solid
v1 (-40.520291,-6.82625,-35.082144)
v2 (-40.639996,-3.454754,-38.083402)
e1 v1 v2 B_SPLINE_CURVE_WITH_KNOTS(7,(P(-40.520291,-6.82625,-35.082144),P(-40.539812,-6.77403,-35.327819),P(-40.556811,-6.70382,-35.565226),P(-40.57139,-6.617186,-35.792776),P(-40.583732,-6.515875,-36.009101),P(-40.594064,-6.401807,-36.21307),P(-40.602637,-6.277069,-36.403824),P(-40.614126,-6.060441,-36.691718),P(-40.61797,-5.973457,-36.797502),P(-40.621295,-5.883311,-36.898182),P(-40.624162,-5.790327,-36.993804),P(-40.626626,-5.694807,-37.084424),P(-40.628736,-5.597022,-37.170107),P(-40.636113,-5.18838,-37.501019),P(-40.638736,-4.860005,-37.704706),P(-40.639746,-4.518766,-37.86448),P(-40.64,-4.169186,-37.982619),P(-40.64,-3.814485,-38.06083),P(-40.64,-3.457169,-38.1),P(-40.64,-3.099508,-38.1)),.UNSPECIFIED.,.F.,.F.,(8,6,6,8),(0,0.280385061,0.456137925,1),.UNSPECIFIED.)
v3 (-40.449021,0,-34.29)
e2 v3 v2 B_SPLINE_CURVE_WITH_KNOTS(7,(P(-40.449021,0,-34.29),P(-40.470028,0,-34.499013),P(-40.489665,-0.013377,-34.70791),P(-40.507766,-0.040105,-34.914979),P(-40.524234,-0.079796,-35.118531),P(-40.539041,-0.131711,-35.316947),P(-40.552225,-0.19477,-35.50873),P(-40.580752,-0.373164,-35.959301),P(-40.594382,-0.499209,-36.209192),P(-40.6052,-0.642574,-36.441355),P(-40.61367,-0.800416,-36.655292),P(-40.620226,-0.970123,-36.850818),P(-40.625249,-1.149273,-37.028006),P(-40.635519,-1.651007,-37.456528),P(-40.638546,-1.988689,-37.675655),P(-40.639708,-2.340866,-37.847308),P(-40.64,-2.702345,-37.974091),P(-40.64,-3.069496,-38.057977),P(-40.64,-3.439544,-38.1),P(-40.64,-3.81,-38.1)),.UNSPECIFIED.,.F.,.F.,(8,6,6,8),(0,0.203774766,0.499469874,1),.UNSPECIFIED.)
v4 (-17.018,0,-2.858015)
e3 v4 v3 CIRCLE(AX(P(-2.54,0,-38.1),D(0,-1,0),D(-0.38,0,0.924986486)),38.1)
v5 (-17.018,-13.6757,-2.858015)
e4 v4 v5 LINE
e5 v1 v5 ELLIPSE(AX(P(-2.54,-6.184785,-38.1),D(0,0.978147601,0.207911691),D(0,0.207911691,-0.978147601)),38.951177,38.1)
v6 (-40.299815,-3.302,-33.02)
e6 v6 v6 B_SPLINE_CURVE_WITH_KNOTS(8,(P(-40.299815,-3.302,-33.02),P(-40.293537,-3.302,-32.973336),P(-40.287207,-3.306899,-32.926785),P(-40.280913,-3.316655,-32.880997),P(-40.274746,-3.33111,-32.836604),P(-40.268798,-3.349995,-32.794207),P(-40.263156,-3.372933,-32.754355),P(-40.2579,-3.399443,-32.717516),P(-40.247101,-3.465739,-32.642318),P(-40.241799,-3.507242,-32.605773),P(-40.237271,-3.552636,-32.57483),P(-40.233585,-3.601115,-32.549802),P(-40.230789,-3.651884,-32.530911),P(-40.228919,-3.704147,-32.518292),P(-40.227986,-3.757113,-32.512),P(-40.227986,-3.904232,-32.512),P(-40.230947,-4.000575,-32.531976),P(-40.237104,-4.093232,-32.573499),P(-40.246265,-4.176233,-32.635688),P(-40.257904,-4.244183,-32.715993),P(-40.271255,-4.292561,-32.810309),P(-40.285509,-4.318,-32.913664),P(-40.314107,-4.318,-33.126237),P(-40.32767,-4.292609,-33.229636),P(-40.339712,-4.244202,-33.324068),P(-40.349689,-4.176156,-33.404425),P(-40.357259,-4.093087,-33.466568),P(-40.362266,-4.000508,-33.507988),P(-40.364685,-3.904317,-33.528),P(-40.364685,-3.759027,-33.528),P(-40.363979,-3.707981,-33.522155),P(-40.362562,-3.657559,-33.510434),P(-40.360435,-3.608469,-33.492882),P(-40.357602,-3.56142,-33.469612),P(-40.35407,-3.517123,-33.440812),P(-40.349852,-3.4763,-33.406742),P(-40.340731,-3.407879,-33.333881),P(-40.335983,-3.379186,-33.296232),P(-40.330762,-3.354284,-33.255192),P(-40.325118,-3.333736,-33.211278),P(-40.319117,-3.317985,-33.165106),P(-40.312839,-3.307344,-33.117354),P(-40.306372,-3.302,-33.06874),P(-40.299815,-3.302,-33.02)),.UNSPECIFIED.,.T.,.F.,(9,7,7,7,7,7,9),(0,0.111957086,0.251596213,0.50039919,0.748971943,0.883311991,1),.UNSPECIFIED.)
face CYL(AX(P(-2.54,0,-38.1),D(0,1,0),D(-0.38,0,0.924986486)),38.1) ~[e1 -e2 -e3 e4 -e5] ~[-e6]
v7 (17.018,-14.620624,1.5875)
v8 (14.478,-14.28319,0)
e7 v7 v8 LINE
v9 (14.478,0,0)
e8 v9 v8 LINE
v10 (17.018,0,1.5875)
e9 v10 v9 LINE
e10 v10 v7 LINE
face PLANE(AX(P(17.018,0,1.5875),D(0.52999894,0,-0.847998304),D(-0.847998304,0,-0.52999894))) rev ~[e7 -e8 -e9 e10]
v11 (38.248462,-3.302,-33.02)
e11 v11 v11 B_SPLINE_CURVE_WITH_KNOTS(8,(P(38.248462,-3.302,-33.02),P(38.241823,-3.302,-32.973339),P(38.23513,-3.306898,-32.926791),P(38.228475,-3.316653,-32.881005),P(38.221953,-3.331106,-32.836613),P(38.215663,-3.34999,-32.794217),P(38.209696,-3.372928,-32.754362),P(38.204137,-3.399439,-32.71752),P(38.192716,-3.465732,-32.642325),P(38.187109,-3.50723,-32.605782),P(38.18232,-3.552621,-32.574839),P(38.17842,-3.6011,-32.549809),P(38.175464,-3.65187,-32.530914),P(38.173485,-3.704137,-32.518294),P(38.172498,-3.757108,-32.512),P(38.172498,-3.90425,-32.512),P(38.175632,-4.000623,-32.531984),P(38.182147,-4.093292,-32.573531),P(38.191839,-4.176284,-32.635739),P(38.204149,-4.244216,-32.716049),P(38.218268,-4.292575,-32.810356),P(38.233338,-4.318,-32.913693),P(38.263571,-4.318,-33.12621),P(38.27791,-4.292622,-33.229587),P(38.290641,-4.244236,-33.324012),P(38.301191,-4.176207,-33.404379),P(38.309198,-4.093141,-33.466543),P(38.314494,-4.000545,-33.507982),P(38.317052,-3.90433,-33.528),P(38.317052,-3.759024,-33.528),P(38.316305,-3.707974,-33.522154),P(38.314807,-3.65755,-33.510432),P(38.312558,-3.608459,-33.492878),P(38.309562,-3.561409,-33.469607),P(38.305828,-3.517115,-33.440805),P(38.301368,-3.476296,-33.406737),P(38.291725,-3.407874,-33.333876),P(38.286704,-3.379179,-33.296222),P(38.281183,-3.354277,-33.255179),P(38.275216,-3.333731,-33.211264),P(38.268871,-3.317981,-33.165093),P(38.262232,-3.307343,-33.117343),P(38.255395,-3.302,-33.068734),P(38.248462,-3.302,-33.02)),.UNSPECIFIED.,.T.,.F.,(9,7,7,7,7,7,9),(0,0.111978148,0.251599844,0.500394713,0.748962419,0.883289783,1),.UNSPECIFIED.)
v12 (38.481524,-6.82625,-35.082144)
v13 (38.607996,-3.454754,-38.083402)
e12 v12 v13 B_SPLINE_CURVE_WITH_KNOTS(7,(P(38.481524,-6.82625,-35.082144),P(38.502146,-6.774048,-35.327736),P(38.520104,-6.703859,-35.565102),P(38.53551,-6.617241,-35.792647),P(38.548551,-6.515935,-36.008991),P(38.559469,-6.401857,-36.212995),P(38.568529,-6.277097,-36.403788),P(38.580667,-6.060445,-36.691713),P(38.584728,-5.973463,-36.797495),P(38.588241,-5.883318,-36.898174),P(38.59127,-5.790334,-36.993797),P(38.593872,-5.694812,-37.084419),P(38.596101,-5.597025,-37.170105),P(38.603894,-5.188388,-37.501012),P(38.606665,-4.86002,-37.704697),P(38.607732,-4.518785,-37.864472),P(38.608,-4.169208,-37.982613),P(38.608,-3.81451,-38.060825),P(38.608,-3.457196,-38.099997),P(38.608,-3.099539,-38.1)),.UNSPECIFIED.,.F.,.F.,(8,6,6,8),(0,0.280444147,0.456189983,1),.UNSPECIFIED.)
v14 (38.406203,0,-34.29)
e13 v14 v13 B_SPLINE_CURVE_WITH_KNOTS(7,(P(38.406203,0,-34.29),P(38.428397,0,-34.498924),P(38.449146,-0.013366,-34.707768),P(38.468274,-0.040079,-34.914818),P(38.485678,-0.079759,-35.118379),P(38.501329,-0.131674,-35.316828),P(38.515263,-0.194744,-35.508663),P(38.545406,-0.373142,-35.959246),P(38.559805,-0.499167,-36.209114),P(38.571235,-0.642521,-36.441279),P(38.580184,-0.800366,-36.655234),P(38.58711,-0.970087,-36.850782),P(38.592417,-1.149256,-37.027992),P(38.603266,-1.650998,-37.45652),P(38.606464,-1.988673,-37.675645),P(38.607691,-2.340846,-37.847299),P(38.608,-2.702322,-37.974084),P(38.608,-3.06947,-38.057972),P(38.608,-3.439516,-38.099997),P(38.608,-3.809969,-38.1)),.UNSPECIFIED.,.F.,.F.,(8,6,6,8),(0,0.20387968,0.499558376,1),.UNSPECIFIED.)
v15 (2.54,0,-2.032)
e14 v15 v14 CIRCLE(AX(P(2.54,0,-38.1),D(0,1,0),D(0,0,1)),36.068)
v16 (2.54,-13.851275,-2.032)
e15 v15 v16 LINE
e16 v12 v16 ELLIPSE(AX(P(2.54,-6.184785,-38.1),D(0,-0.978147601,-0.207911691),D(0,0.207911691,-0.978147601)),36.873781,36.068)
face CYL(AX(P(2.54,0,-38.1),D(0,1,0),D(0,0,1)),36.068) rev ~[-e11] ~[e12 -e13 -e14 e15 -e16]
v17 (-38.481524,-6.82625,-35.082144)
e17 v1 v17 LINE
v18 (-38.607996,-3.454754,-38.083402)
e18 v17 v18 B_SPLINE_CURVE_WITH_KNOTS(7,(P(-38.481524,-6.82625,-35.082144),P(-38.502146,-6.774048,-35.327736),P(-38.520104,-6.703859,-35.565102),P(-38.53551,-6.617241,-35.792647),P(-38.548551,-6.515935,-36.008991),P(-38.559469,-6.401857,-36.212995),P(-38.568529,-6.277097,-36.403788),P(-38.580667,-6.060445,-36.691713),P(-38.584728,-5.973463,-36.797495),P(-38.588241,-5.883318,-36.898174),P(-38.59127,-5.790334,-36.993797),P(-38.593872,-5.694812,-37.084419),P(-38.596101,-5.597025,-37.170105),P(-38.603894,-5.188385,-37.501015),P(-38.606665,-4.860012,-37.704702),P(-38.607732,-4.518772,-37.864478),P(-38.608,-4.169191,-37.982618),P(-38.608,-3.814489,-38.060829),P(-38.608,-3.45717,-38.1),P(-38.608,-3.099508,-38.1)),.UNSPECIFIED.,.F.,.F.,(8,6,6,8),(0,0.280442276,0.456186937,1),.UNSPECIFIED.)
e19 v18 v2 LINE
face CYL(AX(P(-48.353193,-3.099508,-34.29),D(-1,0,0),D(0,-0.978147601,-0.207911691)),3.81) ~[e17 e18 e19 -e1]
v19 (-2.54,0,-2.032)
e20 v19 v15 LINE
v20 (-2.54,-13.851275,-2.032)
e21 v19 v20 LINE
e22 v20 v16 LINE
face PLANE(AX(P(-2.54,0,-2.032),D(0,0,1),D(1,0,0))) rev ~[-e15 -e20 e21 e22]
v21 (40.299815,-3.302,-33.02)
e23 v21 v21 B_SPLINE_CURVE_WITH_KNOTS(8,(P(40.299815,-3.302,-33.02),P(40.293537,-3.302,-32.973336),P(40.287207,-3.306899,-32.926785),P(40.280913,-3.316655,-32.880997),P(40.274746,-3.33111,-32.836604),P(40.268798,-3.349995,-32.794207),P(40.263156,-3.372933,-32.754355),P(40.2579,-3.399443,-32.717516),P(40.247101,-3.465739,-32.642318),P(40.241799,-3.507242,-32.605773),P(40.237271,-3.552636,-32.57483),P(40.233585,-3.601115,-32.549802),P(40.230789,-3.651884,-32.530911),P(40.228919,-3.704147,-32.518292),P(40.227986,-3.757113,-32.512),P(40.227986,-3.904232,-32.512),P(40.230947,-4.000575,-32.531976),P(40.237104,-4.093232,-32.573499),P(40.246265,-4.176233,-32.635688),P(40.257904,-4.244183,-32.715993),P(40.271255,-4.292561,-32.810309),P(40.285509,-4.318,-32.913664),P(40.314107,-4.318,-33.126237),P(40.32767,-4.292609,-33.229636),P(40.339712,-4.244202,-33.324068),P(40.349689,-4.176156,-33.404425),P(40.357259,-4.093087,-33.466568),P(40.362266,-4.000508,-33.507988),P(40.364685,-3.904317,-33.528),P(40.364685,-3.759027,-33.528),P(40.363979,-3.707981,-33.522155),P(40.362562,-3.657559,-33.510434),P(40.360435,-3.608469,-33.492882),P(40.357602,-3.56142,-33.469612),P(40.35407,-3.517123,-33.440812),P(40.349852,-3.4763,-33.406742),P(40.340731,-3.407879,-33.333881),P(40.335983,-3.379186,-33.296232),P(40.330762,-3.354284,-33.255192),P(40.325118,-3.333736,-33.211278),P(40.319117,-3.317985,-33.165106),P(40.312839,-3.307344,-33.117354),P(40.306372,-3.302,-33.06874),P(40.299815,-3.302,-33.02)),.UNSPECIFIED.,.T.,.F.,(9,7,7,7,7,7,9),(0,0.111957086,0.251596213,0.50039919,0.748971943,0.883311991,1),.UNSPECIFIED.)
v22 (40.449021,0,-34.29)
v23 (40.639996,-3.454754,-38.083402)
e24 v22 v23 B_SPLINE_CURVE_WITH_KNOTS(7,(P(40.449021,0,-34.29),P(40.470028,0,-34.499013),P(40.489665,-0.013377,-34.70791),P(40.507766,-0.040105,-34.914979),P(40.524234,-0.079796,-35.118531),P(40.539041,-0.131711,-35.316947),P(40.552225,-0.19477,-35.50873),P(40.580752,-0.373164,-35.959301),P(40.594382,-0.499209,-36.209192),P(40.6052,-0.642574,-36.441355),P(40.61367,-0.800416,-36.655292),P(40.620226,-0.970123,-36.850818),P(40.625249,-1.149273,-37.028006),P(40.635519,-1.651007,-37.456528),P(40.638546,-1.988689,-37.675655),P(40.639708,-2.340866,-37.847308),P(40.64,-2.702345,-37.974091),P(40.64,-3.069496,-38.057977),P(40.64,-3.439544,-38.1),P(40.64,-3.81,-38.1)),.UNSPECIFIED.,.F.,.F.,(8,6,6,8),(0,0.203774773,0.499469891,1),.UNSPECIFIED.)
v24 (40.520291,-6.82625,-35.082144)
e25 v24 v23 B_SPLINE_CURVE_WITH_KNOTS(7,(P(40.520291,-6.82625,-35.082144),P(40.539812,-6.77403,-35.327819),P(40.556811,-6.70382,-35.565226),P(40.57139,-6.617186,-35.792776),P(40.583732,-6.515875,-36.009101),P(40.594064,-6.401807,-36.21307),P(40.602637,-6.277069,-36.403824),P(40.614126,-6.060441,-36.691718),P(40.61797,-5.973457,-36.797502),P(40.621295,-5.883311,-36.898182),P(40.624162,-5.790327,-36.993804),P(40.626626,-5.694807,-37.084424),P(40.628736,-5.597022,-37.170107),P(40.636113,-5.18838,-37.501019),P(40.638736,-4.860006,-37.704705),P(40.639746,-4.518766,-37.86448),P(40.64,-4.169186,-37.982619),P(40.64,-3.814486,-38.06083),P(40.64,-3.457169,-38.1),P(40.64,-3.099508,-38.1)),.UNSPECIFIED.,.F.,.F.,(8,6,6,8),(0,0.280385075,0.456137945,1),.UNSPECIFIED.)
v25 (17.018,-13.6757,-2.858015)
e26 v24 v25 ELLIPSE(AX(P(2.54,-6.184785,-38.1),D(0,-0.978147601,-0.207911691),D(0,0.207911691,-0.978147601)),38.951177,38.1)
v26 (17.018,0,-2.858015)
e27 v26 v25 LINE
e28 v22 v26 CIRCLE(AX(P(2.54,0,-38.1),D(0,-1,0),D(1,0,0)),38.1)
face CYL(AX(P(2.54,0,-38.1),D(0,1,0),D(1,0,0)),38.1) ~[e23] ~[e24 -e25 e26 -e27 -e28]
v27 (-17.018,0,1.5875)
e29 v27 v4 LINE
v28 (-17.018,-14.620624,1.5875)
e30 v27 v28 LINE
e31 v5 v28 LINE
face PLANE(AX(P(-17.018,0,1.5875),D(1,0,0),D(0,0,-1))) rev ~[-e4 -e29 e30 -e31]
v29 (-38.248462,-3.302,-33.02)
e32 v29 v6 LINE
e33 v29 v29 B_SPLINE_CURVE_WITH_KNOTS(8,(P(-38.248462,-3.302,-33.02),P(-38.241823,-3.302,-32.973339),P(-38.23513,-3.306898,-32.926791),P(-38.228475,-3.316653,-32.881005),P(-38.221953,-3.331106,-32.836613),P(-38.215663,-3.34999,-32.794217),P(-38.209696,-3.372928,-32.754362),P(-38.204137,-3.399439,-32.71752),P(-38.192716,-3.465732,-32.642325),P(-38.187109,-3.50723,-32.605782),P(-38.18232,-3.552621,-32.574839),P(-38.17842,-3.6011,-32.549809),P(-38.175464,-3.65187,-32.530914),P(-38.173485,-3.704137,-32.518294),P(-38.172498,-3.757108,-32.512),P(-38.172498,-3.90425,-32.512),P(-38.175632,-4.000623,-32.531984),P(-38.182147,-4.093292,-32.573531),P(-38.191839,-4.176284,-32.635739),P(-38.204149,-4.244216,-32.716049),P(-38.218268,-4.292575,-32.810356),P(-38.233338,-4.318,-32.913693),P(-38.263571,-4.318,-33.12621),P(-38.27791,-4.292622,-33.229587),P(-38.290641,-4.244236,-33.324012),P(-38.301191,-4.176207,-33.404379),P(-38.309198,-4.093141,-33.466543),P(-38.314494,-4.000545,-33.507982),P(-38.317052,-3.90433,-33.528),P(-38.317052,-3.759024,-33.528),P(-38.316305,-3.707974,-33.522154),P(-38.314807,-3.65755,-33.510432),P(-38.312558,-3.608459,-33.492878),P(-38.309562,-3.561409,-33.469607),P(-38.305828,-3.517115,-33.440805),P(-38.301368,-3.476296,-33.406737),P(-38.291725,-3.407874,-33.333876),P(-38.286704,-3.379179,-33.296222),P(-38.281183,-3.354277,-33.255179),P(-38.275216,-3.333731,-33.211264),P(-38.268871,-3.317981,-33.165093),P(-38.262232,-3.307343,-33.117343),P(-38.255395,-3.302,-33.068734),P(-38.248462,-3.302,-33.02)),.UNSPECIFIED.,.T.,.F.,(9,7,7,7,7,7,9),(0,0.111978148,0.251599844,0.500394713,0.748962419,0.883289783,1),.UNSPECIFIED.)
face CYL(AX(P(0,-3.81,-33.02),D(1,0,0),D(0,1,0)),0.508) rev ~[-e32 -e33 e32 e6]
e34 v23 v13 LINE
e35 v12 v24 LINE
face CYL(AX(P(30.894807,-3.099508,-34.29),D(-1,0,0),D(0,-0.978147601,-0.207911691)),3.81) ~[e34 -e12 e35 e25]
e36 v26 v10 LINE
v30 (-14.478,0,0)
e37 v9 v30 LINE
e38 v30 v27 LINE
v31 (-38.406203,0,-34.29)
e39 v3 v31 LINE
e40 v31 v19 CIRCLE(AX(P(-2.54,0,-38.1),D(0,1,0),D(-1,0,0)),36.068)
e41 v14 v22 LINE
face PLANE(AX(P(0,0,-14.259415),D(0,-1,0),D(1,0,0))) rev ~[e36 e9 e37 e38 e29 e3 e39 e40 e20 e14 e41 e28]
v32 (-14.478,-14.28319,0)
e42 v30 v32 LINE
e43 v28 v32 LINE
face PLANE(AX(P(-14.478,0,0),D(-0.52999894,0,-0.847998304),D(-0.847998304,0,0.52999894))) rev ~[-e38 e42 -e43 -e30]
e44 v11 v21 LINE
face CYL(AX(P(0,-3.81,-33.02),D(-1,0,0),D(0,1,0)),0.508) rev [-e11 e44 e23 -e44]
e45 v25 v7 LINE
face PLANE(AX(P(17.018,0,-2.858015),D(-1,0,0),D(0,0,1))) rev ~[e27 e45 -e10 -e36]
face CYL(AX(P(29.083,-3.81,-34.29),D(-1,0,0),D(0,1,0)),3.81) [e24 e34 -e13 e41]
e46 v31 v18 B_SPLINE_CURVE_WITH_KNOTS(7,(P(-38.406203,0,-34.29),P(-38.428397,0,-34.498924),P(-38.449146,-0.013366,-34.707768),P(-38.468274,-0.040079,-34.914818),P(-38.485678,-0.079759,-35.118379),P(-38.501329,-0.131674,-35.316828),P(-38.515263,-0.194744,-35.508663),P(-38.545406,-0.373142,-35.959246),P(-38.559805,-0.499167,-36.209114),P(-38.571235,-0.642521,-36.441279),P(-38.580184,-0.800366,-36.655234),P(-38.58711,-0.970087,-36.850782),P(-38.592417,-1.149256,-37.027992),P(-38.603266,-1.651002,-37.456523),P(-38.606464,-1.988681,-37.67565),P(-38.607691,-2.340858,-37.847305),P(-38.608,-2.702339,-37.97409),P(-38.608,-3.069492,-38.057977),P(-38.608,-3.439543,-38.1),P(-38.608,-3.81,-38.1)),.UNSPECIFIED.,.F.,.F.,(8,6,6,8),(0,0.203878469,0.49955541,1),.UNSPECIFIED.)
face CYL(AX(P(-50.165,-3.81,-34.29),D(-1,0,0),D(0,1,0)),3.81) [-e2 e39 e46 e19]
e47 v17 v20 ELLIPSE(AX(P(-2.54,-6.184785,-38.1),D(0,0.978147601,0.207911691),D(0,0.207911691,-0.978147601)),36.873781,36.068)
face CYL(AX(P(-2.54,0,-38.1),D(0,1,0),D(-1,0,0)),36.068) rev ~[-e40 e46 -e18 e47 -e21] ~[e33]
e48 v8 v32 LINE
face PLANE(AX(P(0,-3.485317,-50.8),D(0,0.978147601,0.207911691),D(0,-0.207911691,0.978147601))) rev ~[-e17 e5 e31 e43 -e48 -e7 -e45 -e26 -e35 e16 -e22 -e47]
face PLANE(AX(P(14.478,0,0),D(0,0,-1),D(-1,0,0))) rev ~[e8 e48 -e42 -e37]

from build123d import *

# Parameters (mm, degrees)
F1_DEPTH      = 25.4
F3_DEPTH      = 40.641
F3_DEPTH_BACK = 40.641
F4_R          = 0.508
F5_DEPTH      = 40.641
F5_DEPTH_BACK = 40.641
F6_T1_DEPTH   = 17.4583858324
F6_T3_DEPTH   = 21.082
F6_T5_DEPTH   = 21.082
F6_T7_DEPTH   = 17.4583858324


# Not quite as in the source:
# - a fillet or chamfer that OpenCascade refuses, or shapes differently, is made with other operations: its cross-section is extruded or revolved along the edge and cut away or added


with BuildPart() as f1:
    # F0 (on Front) → F1 (new body)
    with BuildSketch(Plane.XZ):
        with BuildLine():
            Line((2.54, 0), (0, 0))
            Line((0, 0), (-2.54, 0))
            Line((-2.54, 0), (-14.478, 0))
            Line((-14.478, 0), (-17.018, 0))
            Line((-17.018, 0), (-17.018, -2.8580148686))
            ThreePointArc((-17.018, -2.8580148686), (-34.1882369177, -16.8868177776), (-40.64, -38.1))
            Line((-40.64, -38.1), (-38.608, -38.1))
            ThreePointArc((-38.608, -38.1), (-28.0439273838, -12.5960726162), (-2.54, -2.032))
            Line((-2.54, -2.032), (0, -2.032))
            Line((0, -2.032), (2.54, -2.032))
            ThreePointArc((2.54, -2.032), (28.0439273838, -12.5960726162), (38.608, -38.1))
            Line((38.608, -38.1), (40.64, -38.1))
            ThreePointArc((40.64, -38.1), (34.1882369177, -16.8868177776), (17.018, -2.8580148686))
            Line((17.018, -2.8580148686), (17.018, 0))
            Line((17.018, 0), (14.478, 0))
            Line((14.478, 0), (2.54, 0))
        make_face()
        Polygon((-17.018, 0), (-14.478, 0), (-17.018, 1.5875), align=None)
        Polygon((17.018, 1.5875), (14.478, 0), (17.018, 0), align=None)
    extrude(amount=F1_DEPTH)

    # F2 (on Right) → F3 (cut, two sides)
    with BuildSketch(Plane.YZ) as f3_sk:
        Polygon((-30.48, -50.8), (-3.4853166679, -50.8), (-30.48, 76.2), align=None)
    extrude(amount=-F3_DEPTH, mode=Mode.SUBTRACT)
    extrude(f3_sk.sketch, amount=F3_DEPTH_BACK, mode=Mode.SUBTRACT)

    # F4 (on Right) → F5 (cut, two sides)
    with BuildSketch(Plane.YZ) as f5_sk:
        with Locations((-3.81, -33.02)):
            Circle(F4_R)
    extrude(amount=-F5_DEPTH, mode=Mode.SUBTRACT)
    extrude(f5_sk.sketch, amount=F5_DEPTH_BACK, mode=Mode.SUBTRACT)

    # F6: fillet of radius 3.81 on 4 edges, made by hand

    # F6_s2 → F6_t1 (cut)
    with BuildSketch(Plane.YZ.offset(30.8948070838)):
        with BuildLine():
            ThreePointArc((-6.8262501934, -35.082143542), (-5.4972185245, -37.2509261132), (-3.0995078346, -38.1))
            Line((-3.0995078346, -38.1), (-6.1847850011, -38.1))
            Line((-6.1847850011, -38.1), (-6.8262501934, -35.082143542))
        make_face()
    extrude(amount=F6_T1_DEPTH, mode=Mode.SUBTRACT)

    # F6_s4 → F6_t3 (cut)
    with BuildSketch(Plane.YZ.offset(29.083)):
        with BuildLine():
            ThreePointArc((0, -34.29), (-1.1159231637, -36.9840768363), (-3.81, -38.1))
            Line((-3.81, -38.1), (0, -38.1))
            Line((0, -38.1), (0, -34.29))
        make_face()
    extrude(amount=F6_T3_DEPTH, mode=Mode.SUBTRACT)

    # F6_s6 → F6_t5 (cut)
    with BuildSketch(Plane.YZ.offset(-50.165)):
        with BuildLine():
            ThreePointArc((0, -34.29), (-1.1159231637, -36.9840768363), (-3.81, -38.1))
            Line((-3.81, -38.1), (0, -38.1))
            Line((0, -38.1), (0, -34.29))
        make_face()
    extrude(amount=F6_T5_DEPTH, mode=Mode.SUBTRACT)

    # F6_s8 → F6_t7 (cut)
    with BuildSketch(Plane.YZ.offset(-48.3531929162)):
        with BuildLine():
            ThreePointArc((-6.8262501934, -35.082143542), (-5.4972185245, -37.2509261132), (-3.0995078346, -38.1))
            Line((-3.0995078346, -38.1), (-6.1847850011, -38.1))
            Line((-6.1847850011, -38.1), (-6.8262501934, -35.082143542))
        make_face()
    extrude(amount=F6_T7_DEPTH, mode=Mode.SUBTRACT)


solid = f1.part
